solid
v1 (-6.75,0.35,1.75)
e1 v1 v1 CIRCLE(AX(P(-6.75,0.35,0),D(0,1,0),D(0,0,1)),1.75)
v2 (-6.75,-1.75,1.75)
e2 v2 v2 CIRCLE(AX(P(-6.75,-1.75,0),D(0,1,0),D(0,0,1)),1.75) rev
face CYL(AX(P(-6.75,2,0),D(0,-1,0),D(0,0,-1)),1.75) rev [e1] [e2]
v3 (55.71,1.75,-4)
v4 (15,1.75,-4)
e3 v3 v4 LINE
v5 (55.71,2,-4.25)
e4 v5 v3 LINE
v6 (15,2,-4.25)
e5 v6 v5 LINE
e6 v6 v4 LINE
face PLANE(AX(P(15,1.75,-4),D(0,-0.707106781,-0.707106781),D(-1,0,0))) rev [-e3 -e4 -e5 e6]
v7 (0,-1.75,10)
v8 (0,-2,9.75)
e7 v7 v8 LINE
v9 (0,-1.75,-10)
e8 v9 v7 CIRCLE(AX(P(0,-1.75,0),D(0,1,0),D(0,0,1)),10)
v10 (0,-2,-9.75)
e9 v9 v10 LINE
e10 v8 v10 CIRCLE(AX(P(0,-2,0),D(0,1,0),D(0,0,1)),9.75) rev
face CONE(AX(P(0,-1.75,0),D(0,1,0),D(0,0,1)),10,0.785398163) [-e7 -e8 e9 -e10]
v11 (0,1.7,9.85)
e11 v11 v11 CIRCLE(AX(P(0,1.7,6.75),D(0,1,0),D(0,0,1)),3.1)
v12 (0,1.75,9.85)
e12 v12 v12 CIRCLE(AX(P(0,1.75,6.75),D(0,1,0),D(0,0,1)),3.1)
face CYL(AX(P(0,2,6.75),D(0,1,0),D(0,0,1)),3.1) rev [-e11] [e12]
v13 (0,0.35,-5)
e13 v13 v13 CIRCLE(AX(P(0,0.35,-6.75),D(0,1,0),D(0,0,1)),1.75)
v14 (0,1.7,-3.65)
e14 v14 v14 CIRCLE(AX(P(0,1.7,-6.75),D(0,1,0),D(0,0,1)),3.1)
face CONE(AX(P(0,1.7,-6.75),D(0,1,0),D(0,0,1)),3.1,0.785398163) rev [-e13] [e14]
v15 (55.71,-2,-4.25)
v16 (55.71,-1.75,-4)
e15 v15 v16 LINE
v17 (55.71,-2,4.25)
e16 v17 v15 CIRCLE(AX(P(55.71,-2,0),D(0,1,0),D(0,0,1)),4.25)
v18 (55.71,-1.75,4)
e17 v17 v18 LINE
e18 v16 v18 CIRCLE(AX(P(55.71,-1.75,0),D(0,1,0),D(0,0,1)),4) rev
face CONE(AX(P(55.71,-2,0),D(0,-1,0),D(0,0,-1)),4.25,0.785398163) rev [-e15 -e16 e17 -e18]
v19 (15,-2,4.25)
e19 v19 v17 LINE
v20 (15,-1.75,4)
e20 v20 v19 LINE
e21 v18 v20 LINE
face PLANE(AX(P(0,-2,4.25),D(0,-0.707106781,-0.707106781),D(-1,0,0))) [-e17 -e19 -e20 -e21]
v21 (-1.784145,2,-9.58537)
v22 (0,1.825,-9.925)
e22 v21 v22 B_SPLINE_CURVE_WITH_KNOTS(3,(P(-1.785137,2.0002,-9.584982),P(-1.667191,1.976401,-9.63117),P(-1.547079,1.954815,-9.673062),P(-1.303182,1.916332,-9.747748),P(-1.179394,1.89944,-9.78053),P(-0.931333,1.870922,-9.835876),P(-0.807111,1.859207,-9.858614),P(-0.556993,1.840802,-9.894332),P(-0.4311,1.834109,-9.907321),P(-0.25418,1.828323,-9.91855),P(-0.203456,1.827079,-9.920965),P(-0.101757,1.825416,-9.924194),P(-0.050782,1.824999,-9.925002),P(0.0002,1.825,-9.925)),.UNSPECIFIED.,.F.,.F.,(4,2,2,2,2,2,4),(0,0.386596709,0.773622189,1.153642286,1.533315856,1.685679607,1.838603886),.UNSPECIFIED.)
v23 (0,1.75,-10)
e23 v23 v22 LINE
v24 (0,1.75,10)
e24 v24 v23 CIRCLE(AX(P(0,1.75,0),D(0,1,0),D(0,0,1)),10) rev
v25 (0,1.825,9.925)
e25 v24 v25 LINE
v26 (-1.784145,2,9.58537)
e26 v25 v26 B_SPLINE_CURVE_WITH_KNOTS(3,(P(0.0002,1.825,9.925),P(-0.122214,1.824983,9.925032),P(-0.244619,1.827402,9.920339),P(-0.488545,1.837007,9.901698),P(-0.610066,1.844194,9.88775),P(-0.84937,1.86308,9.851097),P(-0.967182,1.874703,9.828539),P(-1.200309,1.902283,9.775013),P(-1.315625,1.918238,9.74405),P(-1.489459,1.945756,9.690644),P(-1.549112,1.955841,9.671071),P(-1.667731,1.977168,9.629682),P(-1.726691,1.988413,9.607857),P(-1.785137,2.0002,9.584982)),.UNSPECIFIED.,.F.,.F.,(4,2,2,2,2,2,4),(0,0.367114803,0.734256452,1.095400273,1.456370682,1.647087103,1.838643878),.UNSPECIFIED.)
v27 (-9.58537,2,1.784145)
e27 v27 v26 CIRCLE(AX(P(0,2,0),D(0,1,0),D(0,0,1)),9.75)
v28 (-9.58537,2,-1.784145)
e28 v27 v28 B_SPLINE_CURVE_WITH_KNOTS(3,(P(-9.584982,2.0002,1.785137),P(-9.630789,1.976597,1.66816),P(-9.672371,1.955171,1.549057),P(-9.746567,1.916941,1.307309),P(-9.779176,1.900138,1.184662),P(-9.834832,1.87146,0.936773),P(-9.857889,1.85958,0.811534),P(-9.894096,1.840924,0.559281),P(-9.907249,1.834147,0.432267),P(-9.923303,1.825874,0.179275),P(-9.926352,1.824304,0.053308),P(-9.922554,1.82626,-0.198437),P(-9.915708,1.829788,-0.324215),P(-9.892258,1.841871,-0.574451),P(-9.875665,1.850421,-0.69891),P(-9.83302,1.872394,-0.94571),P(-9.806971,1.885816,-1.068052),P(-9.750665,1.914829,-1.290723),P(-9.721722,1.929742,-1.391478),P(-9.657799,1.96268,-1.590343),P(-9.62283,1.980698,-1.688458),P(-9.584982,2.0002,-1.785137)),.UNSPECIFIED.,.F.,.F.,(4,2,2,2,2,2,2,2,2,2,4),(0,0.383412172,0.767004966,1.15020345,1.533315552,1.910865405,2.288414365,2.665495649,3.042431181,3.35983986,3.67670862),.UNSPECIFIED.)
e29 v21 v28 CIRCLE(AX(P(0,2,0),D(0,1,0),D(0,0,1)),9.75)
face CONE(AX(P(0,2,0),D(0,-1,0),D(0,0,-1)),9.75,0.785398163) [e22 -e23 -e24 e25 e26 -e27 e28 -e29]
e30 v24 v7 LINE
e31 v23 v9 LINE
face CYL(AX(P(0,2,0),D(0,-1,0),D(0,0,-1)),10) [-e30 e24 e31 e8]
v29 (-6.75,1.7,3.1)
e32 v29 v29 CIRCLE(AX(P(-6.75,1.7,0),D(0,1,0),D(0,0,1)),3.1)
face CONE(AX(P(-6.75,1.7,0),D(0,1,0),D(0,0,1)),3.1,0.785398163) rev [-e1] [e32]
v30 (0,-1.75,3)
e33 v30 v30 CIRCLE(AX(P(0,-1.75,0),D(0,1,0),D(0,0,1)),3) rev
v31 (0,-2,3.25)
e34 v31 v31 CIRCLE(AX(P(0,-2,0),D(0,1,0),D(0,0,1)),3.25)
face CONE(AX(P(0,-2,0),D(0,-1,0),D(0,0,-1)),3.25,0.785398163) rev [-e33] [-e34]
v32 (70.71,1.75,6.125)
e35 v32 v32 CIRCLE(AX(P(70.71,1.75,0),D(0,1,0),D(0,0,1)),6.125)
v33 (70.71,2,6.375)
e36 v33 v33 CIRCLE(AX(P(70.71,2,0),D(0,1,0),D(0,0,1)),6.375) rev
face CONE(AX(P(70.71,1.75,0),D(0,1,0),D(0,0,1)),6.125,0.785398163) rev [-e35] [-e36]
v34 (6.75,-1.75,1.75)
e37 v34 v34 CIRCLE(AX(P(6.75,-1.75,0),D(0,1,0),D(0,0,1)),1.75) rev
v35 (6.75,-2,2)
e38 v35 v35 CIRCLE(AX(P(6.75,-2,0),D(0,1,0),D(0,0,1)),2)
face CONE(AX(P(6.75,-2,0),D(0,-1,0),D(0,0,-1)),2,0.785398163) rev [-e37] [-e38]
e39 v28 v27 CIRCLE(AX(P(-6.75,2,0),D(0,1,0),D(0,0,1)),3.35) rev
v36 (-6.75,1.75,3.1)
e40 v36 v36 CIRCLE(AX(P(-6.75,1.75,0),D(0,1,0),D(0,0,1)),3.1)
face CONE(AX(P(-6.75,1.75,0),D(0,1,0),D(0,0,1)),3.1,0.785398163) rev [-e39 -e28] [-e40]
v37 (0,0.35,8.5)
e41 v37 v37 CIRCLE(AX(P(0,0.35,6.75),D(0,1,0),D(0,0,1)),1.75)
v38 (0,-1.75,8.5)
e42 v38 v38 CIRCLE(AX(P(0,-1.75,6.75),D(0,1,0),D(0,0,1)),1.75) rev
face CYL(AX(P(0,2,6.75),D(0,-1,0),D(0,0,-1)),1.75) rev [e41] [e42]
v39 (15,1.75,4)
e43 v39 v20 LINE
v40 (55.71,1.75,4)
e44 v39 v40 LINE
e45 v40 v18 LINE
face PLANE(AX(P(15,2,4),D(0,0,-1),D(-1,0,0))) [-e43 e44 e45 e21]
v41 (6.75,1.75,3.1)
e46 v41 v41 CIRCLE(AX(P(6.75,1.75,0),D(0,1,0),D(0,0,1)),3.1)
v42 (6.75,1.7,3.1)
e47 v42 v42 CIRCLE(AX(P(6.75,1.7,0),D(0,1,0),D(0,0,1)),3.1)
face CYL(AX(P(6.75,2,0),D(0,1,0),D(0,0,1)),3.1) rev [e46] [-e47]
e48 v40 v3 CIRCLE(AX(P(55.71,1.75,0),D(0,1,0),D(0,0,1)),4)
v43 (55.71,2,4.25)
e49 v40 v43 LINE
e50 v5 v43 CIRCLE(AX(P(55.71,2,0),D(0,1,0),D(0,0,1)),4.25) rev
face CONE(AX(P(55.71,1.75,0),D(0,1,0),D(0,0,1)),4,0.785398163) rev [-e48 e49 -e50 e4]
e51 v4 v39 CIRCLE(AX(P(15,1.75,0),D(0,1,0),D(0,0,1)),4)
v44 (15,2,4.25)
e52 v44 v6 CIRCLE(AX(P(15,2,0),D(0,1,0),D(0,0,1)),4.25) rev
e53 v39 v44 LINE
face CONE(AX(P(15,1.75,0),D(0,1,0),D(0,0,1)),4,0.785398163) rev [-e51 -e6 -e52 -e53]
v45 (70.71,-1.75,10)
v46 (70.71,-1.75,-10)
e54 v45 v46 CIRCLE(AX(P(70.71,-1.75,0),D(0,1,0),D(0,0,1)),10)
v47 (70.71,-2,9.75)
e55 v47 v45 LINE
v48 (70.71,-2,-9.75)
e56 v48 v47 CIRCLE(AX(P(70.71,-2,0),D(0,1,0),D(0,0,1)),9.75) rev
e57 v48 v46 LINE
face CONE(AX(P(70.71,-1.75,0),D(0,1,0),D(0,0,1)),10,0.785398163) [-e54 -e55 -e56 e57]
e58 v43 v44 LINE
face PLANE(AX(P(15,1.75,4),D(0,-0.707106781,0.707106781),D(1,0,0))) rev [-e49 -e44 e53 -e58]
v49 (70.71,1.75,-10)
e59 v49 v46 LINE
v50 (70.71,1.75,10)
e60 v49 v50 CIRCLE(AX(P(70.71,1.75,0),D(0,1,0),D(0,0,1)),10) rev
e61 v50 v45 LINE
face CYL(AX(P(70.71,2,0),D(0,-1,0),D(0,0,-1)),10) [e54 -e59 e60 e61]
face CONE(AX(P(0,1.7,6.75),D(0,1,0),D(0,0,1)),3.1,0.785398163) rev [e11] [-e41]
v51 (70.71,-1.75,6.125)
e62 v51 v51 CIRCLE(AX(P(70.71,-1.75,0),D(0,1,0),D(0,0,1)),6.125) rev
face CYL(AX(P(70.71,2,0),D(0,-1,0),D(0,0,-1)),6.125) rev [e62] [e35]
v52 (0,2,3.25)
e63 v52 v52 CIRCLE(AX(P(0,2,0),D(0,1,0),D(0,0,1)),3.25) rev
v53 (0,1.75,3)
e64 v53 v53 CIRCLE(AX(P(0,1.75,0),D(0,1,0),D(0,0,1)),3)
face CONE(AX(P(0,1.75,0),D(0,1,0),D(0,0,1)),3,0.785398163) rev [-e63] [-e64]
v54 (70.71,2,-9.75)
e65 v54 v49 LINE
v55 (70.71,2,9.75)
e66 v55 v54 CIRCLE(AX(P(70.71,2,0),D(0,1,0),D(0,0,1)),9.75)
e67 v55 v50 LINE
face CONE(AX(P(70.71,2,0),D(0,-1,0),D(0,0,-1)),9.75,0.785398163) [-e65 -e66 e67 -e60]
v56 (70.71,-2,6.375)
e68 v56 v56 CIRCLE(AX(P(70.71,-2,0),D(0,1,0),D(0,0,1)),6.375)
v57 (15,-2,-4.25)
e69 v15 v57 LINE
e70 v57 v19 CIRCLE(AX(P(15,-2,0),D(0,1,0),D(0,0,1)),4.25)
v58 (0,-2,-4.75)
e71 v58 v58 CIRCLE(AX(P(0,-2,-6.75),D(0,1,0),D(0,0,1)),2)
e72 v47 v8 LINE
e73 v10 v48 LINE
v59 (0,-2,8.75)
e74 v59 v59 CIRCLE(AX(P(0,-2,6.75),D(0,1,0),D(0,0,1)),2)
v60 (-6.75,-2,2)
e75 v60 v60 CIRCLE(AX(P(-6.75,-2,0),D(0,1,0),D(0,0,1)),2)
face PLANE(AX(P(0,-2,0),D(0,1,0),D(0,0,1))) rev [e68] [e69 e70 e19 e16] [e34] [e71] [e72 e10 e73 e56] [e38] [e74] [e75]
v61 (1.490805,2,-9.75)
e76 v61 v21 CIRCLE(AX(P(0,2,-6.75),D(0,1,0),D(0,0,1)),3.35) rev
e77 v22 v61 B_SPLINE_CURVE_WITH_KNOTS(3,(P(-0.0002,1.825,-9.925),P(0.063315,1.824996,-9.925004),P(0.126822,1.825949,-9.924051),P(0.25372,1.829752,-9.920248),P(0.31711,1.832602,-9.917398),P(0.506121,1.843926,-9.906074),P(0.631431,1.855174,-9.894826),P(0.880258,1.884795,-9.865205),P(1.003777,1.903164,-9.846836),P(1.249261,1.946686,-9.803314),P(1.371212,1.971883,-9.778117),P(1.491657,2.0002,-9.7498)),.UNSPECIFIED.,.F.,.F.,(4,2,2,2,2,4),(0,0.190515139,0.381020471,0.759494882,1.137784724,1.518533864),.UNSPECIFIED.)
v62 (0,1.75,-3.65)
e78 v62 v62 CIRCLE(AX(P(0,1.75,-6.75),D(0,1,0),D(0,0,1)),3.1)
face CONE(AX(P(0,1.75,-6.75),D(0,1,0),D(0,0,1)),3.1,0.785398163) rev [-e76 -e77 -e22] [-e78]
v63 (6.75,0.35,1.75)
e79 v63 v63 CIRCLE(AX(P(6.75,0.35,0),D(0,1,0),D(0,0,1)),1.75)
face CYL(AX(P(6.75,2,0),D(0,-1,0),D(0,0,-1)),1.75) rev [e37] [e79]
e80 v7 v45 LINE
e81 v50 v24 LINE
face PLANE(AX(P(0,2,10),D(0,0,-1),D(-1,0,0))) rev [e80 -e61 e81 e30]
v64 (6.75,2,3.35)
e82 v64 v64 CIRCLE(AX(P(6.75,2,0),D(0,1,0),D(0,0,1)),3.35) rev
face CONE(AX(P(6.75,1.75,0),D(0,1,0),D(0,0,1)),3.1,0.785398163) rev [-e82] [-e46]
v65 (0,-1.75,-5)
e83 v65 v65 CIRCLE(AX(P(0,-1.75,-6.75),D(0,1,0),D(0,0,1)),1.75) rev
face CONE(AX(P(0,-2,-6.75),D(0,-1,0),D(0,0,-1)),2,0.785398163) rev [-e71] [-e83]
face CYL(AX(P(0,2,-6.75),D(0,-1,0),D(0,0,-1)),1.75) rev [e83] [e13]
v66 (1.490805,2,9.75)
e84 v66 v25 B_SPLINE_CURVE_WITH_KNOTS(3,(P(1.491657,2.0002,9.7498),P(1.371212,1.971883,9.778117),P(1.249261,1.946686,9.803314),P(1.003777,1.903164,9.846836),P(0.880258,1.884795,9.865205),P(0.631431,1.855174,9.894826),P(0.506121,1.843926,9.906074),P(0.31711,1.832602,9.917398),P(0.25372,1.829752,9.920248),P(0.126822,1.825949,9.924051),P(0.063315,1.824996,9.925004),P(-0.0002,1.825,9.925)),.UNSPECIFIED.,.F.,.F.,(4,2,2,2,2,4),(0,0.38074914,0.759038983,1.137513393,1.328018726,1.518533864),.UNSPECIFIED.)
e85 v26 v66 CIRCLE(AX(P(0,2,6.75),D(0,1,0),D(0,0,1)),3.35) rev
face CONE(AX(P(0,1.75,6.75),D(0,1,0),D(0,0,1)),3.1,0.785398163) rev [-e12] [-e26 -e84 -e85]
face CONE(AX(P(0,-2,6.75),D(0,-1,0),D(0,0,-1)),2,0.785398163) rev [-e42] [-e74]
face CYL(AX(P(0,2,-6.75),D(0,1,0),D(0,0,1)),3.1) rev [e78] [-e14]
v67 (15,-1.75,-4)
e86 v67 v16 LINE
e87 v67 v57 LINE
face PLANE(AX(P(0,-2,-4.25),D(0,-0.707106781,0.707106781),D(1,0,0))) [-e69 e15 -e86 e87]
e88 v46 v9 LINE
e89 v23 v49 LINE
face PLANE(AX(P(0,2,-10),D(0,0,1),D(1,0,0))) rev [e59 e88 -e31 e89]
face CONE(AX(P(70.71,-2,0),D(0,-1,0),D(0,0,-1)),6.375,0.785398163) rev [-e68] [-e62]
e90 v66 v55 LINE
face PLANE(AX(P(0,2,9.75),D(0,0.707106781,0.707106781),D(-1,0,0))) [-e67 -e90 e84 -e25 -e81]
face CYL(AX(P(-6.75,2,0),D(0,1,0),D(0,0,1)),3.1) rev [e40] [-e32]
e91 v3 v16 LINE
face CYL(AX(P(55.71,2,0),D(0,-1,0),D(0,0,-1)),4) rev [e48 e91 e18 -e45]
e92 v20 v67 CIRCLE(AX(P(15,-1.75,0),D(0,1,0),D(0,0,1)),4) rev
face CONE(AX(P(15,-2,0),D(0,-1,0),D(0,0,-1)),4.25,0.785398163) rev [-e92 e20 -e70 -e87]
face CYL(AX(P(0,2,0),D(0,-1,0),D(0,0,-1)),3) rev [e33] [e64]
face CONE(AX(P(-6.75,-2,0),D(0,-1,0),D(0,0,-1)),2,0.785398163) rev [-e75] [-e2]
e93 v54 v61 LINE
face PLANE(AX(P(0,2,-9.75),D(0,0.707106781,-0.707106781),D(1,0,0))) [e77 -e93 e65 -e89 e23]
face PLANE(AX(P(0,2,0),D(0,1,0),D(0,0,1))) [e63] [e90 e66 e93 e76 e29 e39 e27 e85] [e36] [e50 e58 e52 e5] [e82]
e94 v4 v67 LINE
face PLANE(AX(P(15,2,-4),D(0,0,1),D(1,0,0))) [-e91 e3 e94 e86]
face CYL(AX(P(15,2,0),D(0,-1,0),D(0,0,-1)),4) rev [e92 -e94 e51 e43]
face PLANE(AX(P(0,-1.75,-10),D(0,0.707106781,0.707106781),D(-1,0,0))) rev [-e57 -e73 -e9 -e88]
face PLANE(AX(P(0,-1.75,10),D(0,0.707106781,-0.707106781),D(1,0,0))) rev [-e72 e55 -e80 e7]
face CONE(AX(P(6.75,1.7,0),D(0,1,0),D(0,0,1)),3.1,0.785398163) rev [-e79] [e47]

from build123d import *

# Parameters (mm, degrees)
SKETCH1_R                                      = 1.75
SKETCH1_R_2                                    = 3
SKETCH1_R_3                                    = 6.125
BOSS_EXTRUDE1_DEPTH                            = 2
CSK_FOR_M3_FLAT_HEAD_MACHINE_SCREW2_AT_2_COUNT = 2
CSK_FOR_M3_FLAT_HEAD_MACHINE_SCREW2_AT_2_PITCH = 9.545941546
CSK_FOR_M3_FLAT_HEAD_MACHINE_SCREW2_AT_3_COUNT = 2
CSK_FOR_M3_FLAT_HEAD_MACHINE_SCREW2_AT_3_PITCH = 13.5
CSK_FOR_M3_FLAT_HEAD_MACHINE_SCREW2_AT_4_COUNT = 2
CSK_FOR_M3_FLAT_HEAD_MACHINE_SCREW2_AT_4_PITCH = 9.545941546
CHAMFER1_SIZE                                  = 0.25


with BuildPart() as part:
    # Sketch1 → Boss-Extrude1 (new, symmetric)
    with BuildSketch(Plane(origin=(0, 0, 0), x_dir=(1, 0, 0), z_dir=(0, 1, 0))):
        with BuildLine():
            Line((0, 10), (70.71, 10))
            ThreePointArc((70.71, 10), (80.71, 0), (70.71, -10))
            Line((70.71, -10), (0, -10))
            ThreePointArc((0, -10), (-10, 0), (0, 10))
        make_face()
        with Locations(Location((0, 6.75, 0), (0, 0, 270))):
            Circle(SKETCH1_R, mode=Mode.SUBTRACT)
        with Locations(Location((6.75, 0, 0), (0, 0, 270))):
            Circle(SKETCH1_R, mode=Mode.SUBTRACT)
        with Locations(Location((0, -6.75, 0), (0, 0, 270))):
            Circle(SKETCH1_R, mode=Mode.SUBTRACT)
        with Locations(Location((-6.75, 0, 0), (0, 0, 270))):
            Circle(SKETCH1_R, mode=Mode.SUBTRACT)
        with Locations(Location((0, 0, 0), (0, 0, 270))):
            Circle(SKETCH1_R_2, mode=Mode.SUBTRACT)
        with Locations(Location((70.71, 0, 0), (0, 0, 270))):
            Circle(SKETCH1_R_3, mode=Mode.SUBTRACT)
        with BuildLine():
            Line((15, 4), (55.71, 4))
            ThreePointArc((55.71, 4), (59.71, 0), (55.71, -4))
            Line((55.71, -4), (15, -4))
            ThreePointArc((15, -4), (11, 0), (15, 4))
        make_face(mode=Mode.SUBTRACT)
    extrude(amount=BOSS_EXTRUDE1_DEPTH, both=True)

    # Sketch3 → CSK for M3 Flat Head Machine Screw2 (revolve, cut)
    with BuildSketch(Plane(origin=(0, 2, -6.75), x_dir=(0, 0, 1), z_dir=(1, 0, 0))):
        Polygon((0, 0), (0, 4), (1.75, 4), (1.75, 1.65), (3.1, 0.3), (3.1, 0), align=None)
    csk_for_m3_flat_head_machine_screw2 = revolve(axis=Axis((0, 8.35, -6.75), (0, -1, 0)), mode=Mode.SUBTRACT)

    # CSK for M3 Flat Head Machine Screw2 at 2: CSK for M3 Flat Head Machine Screw2 ×2
    with Locations(*[Vector(0.7071067811865476, 0, 0.7071067811865476) * (i * CSK_FOR_M3_FLAT_HEAD_MACHINE_SCREW2_AT_2_PITCH) for i in range(1, CSK_FOR_M3_FLAT_HEAD_MACHINE_SCREW2_AT_2_COUNT)]):
        add(csk_for_m3_flat_head_machine_screw2, mode=Mode.SUBTRACT)

    # CSK for M3 Flat Head Machine Screw2 at 3: CSK for M3 Flat Head Machine Screw2 ×2
    with Locations(*[(0, 0, i * CSK_FOR_M3_FLAT_HEAD_MACHINE_SCREW2_AT_3_PITCH) for i in range(1, CSK_FOR_M3_FLAT_HEAD_MACHINE_SCREW2_AT_3_COUNT)]):
        add(csk_for_m3_flat_head_machine_screw2, mode=Mode.SUBTRACT)

    # CSK for M3 Flat Head Machine Screw2 at 4: CSK for M3 Flat Head Machine Screw2 ×2
    with Locations(*[Vector(-0.7071067811865476, 0, 0.7071067811865476) * (i * CSK_FOR_M3_FLAT_HEAD_MACHINE_SCREW2_AT_4_PITCH) for i in range(1, CSK_FOR_M3_FLAT_HEAD_MACHINE_SCREW2_AT_4_COUNT)]):
        add(csk_for_m3_flat_head_machine_screw2, mode=Mode.SUBTRACT)

    # Chamfer1
    # the kernel refuses this chamfer: 0.25 mm, written as the material it takes off along each edge
    with BuildSketch(Plane(origin=(0, -2, -6.75), x_dir=(0, 0, 1), z_dir=(-1, 0, 0))) as chamfer1_piece_1:
        Polygon((1.75 + CHAMFER1_SIZE, 0), (1.75, CHAMFER1_SIZE), (1.75, 0), align=None)
    revolve(axis=Axis((0, -2, -6.75), (0, 1, 0)), mode=Mode.SUBTRACT)
    with BuildSketch(Plane(origin=(70.71, 2, 0), x_dir=(0, 0, -1), z_dir=(-1, 0, 0))) as chamfer1_piece_2:
        Polygon((10, CHAMFER1_SIZE), (10 - CHAMFER1_SIZE, 0), (10, 0), align=None)
    revolve(axis=Axis((70.71, 2, 0), (0, -1, 0)), revolution_arc=180, mode=Mode.SUBTRACT)
    with BuildSketch(Plane(origin=(6.75, -2, 0), x_dir=(0, 0, 1), z_dir=(-1, 0, 0))) as chamfer1_piece_3:
        Polygon((1.75 + CHAMFER1_SIZE, 0), (1.75, CHAMFER1_SIZE), (1.75, 0), align=None)
    revolve(axis=Axis((6.75, -2, 0), (0, 1, 0)), mode=Mode.SUBTRACT)
    with BuildSketch(Plane(origin=(0, 2, -10), x_dir=(0, -0.9996219169112968, -0.027495876610589075), z_dir=(1, 0, 0)), Plane(origin=(70.71, -2, 10), x_dir=(0, -0.02749587661058555, -0.9996219169112968), z_dir=(-1, 0, 0))) as chamfer1_piece_4:
        Polygon((CHAMFER1_SIZE * 0.999621916911, -CHAMFER1_SIZE * 0.0274958766106), (-CHAMFER1_SIZE * 0.0274958766106, -CHAMFER1_SIZE * 0.999621916911), (0, 0), align=None)
    extrude(amount=70.71, mode=Mode.SUBTRACT)
    with BuildSketch(Plane(origin=(0, -2, 6.75), x_dir=(0, 0, 1), z_dir=(-1, 0, 0))) as chamfer1_piece_5:
        Polygon((1.75 + CHAMFER1_SIZE, 0), (1.75, CHAMFER1_SIZE), (1.75, 0), align=None)
    revolve(axis=Axis((0, -2, 6.75), (0, 1, 0)), mode=Mode.SUBTRACT)
    with BuildSketch(Plane(origin=(-6.75, -2, 0), x_dir=(0, 0, 1), z_dir=(-1, 0, 0))) as chamfer1_piece_6:
        Polygon((1.75 + CHAMFER1_SIZE, 0), (1.75, CHAMFER1_SIZE), (1.75, 0), align=None)
    revolve(axis=Axis((-6.75, -2, 0), (0, 1, 0)), mode=Mode.SUBTRACT)
    with BuildSketch(Plane(origin=(0, -2, 0), x_dir=(0, 0, 1), z_dir=(-1, 0, 0))) as chamfer1_piece_7:
        Polygon((3 + CHAMFER1_SIZE, 0), (3, CHAMFER1_SIZE), (3, 0), align=None)
    revolve(axis=Axis((0, -2, 0), (0, 1, 0)), mode=Mode.SUBTRACT)
    with BuildSketch(Plane(origin=(0, 2, 0), x_dir=(0, 0, 1), z_dir=(-1, 0, 0))) as chamfer1_piece_8:
        Polygon((3 + CHAMFER1_SIZE, 0), (3, -CHAMFER1_SIZE), (3, 0), align=None)
    revolve(axis=Axis((0, 2, 0), (0, 1, 0)), mode=Mode.SUBTRACT)
    with BuildSketch(Plane(origin=(70.71, -2, 0), x_dir=(0, 0, 1), z_dir=(-1, 0, 0))) as chamfer1_piece_9:
        Polygon((6.125 + CHAMFER1_SIZE, 0), (6.125, CHAMFER1_SIZE), (6.125, 0), align=None)
    revolve(axis=Axis((70.71, -2, 0), (0, 1, 0)), mode=Mode.SUBTRACT)
    with BuildSketch(Plane(origin=(70.71, 2, 0), x_dir=(0, 0, 1), z_dir=(-1, 0, 0))) as chamfer1_piece_10:
        Polygon((6.125 + CHAMFER1_SIZE, 0), (6.125, -CHAMFER1_SIZE), (6.125, 0), align=None)
    revolve(axis=Axis((70.71, 2, 0), (0, 1, 0)), mode=Mode.SUBTRACT)
    with BuildSketch(Plane(origin=(15, -2, 0), x_dir=(0, 0, 1), z_dir=(1, 0, 0))) as chamfer1_piece_11:
        Polygon((4 + CHAMFER1_SIZE, 0), (4, -CHAMFER1_SIZE), (4, 0), align=None)
    revolve(axis=Axis((15, -2, 0), (0, -1, 0)), revolution_arc=180, mode=Mode.SUBTRACT)
    with BuildSketch(Plane(origin=(55.71, -2, 4), x_dir=(0, -0.0274958766105856, 0.9996219169112968), z_dir=(-1, 0, 0)), Plane(origin=(15, -2, -4), x_dir=(0, -0.027495876610585647, -0.9996219169112968), z_dir=(1, 0, 0))) as chamfer1_piece_12:
        Polygon((CHAMFER1_SIZE * 0.999621916911, CHAMFER1_SIZE * 0.0274958766106), (-CHAMFER1_SIZE * 0.0274958766106, CHAMFER1_SIZE * 0.999621916911), (0, 0), align=None)
    extrude(amount=40.71, mode=Mode.SUBTRACT)
    with BuildSketch(Plane(origin=(55.71, -2, 0), x_dir=(0, 0, -1), z_dir=(-1, 0, 0))) as chamfer1_piece_13:
        Polygon((4 + CHAMFER1_SIZE, 0), (4, -CHAMFER1_SIZE), (4, 0), align=None)
    revolve(axis=Axis((55.71, -2, 0), (0, -1, 0)), revolution_arc=180, mode=Mode.SUBTRACT)
    with BuildSketch(Plane(origin=(15, 2, 0), x_dir=(0, 0, 1), z_dir=(1, 0, 0))) as chamfer1_piece_14:
        Polygon((4 + CHAMFER1_SIZE, 0), (4, CHAMFER1_SIZE), (4, 0), align=None)
    revolve(axis=Axis((15, 2, 0), (0, -1, 0)), revolution_arc=180, mode=Mode.SUBTRACT)
    with BuildSketch(Plane(origin=(55.71, 2, 4), x_dir=(0, 0.0274958766105856, 0.9996219169112968), z_dir=(-1, 0, 0)), Plane(origin=(15, 2, -4), x_dir=(0, 0.027495876610585647, -0.9996219169112968), z_dir=(1, 0, 0))) as chamfer1_piece_15:
        Polygon((CHAMFER1_SIZE * 0.999621916911, -CHAMFER1_SIZE * 0.0274958766106), (-CHAMFER1_SIZE * 0.0274958766106, -CHAMFER1_SIZE * 0.999621916911), (0, 0), align=None)
    extrude(amount=40.71, mode=Mode.SUBTRACT)
    with BuildSketch(Plane(origin=(55.71, 2, 0), x_dir=(0, 0, -1), z_dir=(-1, 0, 0))) as chamfer1_piece_16:
        Polygon((4 + CHAMFER1_SIZE, 0), (4, CHAMFER1_SIZE), (4, 0), align=None)
    revolve(axis=Axis((55.71, 2, 0), (0, -1, 0)), revolution_arc=180, mode=Mode.SUBTRACT)
    with BuildSketch(Plane(origin=(0, 2, 0), x_dir=(0, 0, 1), z_dir=(1, 0, 0))) as chamfer1_piece_17:
        Polygon((10, CHAMFER1_SIZE), (10 - CHAMFER1_SIZE, 0), (10, 0), align=None)
    revolve(axis=Axis((0, 2, 0), (0, -1, 0)), revolution_arc=180, mode=Mode.SUBTRACT)
    with BuildSketch(Plane(origin=(0, -2, -10), x_dir=(0, 0.9996219169112968, -0.027495876610589075), z_dir=(1, 0, 0)), Plane(origin=(70.71, 2, 10), x_dir=(0, 0.02749587661058555, -0.9996219169112968), z_dir=(-1, 0, 0))) as chamfer1_piece_18:
        Polygon((CHAMFER1_SIZE * 0.999621916911, CHAMFER1_SIZE * 0.0274958766106), (-CHAMFER1_SIZE * 0.0274958766106, CHAMFER1_SIZE * 0.999621916911), (0, 0), align=None)
    extrude(amount=70.71, mode=Mode.SUBTRACT)
    with BuildSketch(Plane(origin=(70.71, -2, 0), x_dir=(0, 0, -1), z_dir=(-1, 0, 0))) as chamfer1_piece_19:
        Polygon((10 - CHAMFER1_SIZE, 0), (10, -CHAMFER1_SIZE), (10, 0), align=None)
    revolve(axis=Axis((70.71, -2, 0), (0, -1, 0)), revolution_arc=180, mode=Mode.SUBTRACT)
    with BuildSketch(Plane(origin=(-6.75, 2, 0), x_dir=(0, 0, 1), z_dir=(1, 0, 0))) as chamfer1_piece_20:
        Polygon((3.1 + CHAMFER1_SIZE, 0), (3.1, CHAMFER1_SIZE), (3.1, 0), align=None)
    revolve(axis=Axis((-6.75, 2, 0), (0, -1, 0)), mode=Mode.SUBTRACT)
    with BuildSketch(Plane(origin=(0, -2, 0), x_dir=(0, 0, 1), z_dir=(1, 0, 0))) as chamfer1_piece_21:
        Polygon((10, -CHAMFER1_SIZE), (10 - CHAMFER1_SIZE, 0), (10, 0), align=None)
    revolve(axis=Axis((0, -2, 0), (0, -1, 0)), revolution_arc=180, mode=Mode.SUBTRACT)
    with BuildSketch(Plane(origin=(0, 2, 6.75), x_dir=(0, 0, 1), z_dir=(1, 0, 0))) as chamfer1_piece_22:
        Polygon((3.1 + CHAMFER1_SIZE, 0), (3.1, CHAMFER1_SIZE), (3.1, 0), align=None)
    revolve(axis=Axis((0, 2, 6.75), (0, -1, 0)), mode=Mode.SUBTRACT)
    with BuildSketch(Plane(origin=(6.75, 2, 0), x_dir=(0, 0, 1), z_dir=(1, 0, 0))) as chamfer1_piece_23:
        Polygon((3.1 + CHAMFER1_SIZE, 0), (3.1, CHAMFER1_SIZE), (3.1, 0), align=None)
    revolve(axis=Axis((6.75, 2, 0), (0, -1, 0)), mode=Mode.SUBTRACT)
    with BuildSketch(Plane(origin=(0, 2, -6.75), x_dir=(0, 0, 1), z_dir=(1, 0, 0))) as chamfer1_piece_24:
        Polygon((3.1 + CHAMFER1_SIZE, 0), (3.1, CHAMFER1_SIZE), (3.1, 0), align=None)
    revolve(axis=Axis((0, 2, -6.75), (0, -1, 0)), mode=Mode.SUBTRACT)


solid = part.part
